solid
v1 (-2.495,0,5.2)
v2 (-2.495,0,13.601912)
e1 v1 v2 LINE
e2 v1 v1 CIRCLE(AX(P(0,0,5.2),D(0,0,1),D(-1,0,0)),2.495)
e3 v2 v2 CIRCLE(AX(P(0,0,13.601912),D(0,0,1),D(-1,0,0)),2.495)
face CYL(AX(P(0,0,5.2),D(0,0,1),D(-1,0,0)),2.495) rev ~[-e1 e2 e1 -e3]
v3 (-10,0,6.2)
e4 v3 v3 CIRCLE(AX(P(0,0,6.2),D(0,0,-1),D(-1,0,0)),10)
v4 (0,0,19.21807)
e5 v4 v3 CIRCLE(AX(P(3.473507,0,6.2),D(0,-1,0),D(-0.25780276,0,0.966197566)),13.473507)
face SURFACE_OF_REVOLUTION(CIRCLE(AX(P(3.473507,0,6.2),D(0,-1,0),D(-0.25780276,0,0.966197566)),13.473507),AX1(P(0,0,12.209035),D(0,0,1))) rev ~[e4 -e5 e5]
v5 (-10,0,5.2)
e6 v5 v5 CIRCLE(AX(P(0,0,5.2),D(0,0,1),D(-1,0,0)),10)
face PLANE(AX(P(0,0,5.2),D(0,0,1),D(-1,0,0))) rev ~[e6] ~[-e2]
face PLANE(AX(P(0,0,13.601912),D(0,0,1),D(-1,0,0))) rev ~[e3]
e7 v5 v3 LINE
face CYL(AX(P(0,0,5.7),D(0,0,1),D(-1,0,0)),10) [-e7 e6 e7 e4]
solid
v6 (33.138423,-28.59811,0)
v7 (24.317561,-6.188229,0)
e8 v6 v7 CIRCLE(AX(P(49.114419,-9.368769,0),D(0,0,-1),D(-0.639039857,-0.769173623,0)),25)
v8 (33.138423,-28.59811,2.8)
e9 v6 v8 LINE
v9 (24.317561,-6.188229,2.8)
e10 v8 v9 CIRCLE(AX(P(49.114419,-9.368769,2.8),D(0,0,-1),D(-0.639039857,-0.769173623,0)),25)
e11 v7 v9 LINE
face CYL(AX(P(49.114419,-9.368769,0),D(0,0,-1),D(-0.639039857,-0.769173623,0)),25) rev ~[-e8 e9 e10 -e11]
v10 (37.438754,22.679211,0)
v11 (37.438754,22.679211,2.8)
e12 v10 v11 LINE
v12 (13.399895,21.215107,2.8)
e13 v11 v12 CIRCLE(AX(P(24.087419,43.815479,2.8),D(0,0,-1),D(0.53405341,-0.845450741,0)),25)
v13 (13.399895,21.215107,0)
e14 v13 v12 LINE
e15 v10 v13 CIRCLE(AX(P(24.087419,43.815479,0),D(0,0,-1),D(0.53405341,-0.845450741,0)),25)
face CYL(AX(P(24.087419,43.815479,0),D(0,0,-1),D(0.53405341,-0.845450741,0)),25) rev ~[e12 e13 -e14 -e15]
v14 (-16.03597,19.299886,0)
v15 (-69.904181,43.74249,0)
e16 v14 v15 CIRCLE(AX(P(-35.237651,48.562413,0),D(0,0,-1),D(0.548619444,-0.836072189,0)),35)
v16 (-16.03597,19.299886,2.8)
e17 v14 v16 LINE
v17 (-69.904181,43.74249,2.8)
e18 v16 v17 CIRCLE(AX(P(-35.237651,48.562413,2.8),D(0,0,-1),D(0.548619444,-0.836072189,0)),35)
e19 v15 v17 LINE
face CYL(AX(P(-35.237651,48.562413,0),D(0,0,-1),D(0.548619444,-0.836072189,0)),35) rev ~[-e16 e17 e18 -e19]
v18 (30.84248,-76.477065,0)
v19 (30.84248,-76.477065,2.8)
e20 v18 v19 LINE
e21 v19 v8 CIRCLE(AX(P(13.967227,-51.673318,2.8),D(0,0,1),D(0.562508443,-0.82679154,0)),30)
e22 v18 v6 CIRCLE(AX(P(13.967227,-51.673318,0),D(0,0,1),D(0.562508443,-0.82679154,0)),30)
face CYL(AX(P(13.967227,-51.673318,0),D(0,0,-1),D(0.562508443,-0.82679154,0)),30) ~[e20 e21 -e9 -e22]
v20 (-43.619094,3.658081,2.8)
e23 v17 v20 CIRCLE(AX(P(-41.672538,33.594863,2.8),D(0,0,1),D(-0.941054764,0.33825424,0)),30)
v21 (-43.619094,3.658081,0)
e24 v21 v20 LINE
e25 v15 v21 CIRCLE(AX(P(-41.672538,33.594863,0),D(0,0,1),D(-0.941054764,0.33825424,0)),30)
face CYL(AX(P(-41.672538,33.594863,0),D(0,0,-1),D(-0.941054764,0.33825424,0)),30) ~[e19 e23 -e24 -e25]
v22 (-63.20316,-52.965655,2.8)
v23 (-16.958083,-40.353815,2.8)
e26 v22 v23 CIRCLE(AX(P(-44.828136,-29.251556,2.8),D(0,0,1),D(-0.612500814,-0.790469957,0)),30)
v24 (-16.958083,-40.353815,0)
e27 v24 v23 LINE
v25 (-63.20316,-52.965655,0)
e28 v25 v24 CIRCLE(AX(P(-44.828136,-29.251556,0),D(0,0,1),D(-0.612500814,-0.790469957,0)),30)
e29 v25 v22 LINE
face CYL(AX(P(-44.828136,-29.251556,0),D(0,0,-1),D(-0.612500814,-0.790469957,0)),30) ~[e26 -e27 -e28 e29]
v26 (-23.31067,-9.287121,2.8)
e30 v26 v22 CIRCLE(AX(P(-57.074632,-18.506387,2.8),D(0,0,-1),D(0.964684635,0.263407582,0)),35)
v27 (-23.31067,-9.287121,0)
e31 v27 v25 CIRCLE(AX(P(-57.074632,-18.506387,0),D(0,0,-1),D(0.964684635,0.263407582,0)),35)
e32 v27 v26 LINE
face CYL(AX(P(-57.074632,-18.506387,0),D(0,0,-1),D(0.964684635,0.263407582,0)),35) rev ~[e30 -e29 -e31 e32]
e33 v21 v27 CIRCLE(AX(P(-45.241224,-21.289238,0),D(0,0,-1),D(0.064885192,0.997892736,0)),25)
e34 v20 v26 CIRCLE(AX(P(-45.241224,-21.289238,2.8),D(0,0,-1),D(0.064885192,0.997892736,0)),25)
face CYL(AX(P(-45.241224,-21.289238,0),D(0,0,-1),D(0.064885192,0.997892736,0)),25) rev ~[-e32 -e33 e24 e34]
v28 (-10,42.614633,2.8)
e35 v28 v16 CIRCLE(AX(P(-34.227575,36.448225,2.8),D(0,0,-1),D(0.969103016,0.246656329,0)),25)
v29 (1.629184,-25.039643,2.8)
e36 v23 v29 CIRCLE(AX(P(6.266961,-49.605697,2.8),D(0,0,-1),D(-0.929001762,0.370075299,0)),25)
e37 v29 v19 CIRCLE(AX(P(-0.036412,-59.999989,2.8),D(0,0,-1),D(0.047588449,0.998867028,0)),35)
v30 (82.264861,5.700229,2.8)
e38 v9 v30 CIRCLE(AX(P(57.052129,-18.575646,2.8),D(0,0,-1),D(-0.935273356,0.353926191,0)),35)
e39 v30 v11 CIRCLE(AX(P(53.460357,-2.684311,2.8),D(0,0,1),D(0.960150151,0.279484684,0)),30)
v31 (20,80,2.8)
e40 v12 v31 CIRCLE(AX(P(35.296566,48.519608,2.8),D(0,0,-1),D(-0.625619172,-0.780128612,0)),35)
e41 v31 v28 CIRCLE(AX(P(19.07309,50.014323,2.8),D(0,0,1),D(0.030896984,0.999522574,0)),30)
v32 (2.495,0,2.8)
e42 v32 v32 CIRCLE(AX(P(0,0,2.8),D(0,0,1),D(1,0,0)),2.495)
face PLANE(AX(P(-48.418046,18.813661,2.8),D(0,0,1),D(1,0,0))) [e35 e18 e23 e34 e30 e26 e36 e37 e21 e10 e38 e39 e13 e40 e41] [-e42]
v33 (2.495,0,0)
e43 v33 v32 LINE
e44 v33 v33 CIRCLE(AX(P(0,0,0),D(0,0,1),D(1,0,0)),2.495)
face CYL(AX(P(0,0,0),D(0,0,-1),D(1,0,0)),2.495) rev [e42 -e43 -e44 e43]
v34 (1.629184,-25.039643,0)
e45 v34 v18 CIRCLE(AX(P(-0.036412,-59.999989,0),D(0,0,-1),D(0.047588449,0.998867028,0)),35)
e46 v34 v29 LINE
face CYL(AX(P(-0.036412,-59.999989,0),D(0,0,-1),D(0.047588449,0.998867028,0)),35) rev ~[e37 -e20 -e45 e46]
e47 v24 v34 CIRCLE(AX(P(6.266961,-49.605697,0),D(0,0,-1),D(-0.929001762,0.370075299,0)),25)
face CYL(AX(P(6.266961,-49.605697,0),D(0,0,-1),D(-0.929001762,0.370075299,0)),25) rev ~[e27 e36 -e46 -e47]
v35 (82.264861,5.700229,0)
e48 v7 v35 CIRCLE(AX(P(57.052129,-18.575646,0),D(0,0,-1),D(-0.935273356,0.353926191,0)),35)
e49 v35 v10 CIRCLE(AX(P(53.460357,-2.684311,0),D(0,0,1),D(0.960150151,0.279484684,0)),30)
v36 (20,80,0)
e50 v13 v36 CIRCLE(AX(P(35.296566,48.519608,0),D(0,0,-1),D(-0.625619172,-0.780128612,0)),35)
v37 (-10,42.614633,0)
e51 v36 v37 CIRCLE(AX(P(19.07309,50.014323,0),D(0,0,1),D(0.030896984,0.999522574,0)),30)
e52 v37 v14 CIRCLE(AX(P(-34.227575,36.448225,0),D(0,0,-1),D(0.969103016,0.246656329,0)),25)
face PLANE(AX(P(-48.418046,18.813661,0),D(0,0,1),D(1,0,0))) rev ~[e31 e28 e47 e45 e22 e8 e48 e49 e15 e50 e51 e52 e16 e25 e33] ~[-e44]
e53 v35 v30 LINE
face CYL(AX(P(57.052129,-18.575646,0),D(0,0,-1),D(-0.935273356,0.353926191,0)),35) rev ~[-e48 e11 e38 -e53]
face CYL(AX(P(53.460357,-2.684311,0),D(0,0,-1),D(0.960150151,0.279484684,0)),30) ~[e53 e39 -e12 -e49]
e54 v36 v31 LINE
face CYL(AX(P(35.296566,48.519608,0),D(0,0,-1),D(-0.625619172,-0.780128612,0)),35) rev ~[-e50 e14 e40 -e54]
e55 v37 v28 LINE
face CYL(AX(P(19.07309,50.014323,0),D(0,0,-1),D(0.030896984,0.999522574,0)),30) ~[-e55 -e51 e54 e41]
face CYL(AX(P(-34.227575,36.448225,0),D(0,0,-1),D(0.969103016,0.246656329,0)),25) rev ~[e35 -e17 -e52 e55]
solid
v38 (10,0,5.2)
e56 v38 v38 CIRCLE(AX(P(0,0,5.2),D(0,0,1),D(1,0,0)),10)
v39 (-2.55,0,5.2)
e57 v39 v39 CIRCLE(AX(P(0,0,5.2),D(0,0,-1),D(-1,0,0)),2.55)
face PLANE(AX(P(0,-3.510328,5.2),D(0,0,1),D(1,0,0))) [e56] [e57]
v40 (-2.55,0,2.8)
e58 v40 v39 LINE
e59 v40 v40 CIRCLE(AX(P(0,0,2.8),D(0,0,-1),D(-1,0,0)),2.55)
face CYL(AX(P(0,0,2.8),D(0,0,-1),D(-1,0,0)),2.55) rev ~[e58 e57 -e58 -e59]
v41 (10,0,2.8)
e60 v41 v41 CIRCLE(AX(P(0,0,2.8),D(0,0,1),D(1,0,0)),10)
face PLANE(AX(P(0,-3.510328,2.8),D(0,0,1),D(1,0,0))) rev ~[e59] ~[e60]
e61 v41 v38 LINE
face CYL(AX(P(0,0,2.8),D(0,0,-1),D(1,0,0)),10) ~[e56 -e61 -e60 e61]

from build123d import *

# Parameters (mm, degrees)
F0_R     = 2.495
F1_DEPTH = 2.8
F3_DEPTH = 2.4
F5_DEPTH = 1
F6_W     = 7.505
F6_H     = 1


with BuildPart() as f1:
    # F0 (on Top) → F1 (new body)
    with BuildSketch(Plane.XY):
        with BuildLine():
            ThreePointArc((-22.7858082993, 10.2862500528), (-20.3407682899, 14.5345500576), (-17.1137876985, 18.2241123408))
            ThreePointArc((-17.1137876985, 18.2241123408), (-16.5666860585, 18.7537908739), (-16.0359703203, 19.2998864317))
            ThreePointArc((-16.0359703203, 19.2998864317), (-49.6996912533, 16.6900208036), (-69.9041814161, 43.7424898759))
            ThreePointArc((-69.9041814161, 43.7424898759), (-66.7598038962, 17.1440537541), (-43.6190942577, 3.6580806138))
            ThreePointArc((-43.6190942577, 3.6580806138), (-32.5771806136, 5.0068500705), (-22.7858082993, 10.2862500528))
        make_face()
        with BuildLine():
            ThreePointArc((-23.7810968086, -7.7109943963), (-24.9618581995, 1.3804474739), (-22.7858082993, 10.2862500528))
            ThreePointArc((-22.7858082993, 10.2862500528), (-32.5771806136, 5.0068500705), (-43.6190942577, 3.6580806138))
            ThreePointArc((-43.6190942577, 3.6580806138), (-31.8033376807, -0.2078903454), (-23.3106701049, -9.2871211714))
            ThreePointArc((-23.3106701049, -9.2871211714), (-23.5366233714, -8.4962939253), (-23.7810968086, -7.7109943963))
        make_face()
        with BuildLine():
            ThreePointArc((-14.6823545264, 20.2343387725), (-6.4007548293, 24.1667196288), (2.7416031459, 24.8492175368))
            ThreePointArc((2.7416031459, 24.8492175368), (-5.3051050528, 32.5299416652), (-10, 42.6146329052))
            ThreePointArc((-10, 42.6146329052), (-10.0254872889, 30.1825298915), (-16.0359703203, 19.2998864317))
            ThreePointArc((-16.0359703203, 19.2998864317), (-15.353672314, 19.7591598168), (-14.6823545264, 20.2343387725))
        make_face()
        with BuildLine():
            ThreePointArc((-17.1137876985, 18.2241123408), (-15.9298122297, 19.2676174533), (-14.6823545264, 20.2343387725))
            ThreePointArc((-14.6823545264, 20.2343387725), (-15.353672314, 19.7591598168), (-16.0359703203, 19.2998864317))
            ThreePointArc((-16.0359703203, 19.2998864317), (-16.5666860585, 18.7537908739), (-17.1137876985, 18.2241123408))
        make_face()
        with BuildLine():
            ThreePointArc((24.5572095563, -4.684384571), (24.8890562186, -2.3526326842), (25, 0))
            ThreePointArc((25, 0), (24.8697135657, 2.5489894392), (24.4802122271, 5.0714109788))
            ThreePointArc((24.4802122271, 5.0714109788), (21.0059741613, 13.5554066532), (14.7069026764, 20.2165034976))
            ThreePointArc((14.7069026764, 20.2165034976), (13.4020104362, 21.1041729586), (12.0437095584, 21.9077397299))
            ThreePointArc((12.0437095584, 21.9077397299), (7.5375354635, 23.8366432019), (2.7416031459, 24.8492175368))
            ThreePointArc((2.7416031459, 24.8492175368), (-6.4007548293, 24.1667196288), (-14.6823545264, 20.2343387725))
            ThreePointArc((-14.6823545264, 20.2343387725), (-15.9298122297, 19.2676174533), (-17.1137876985, 18.2241123408))
            ThreePointArc((-17.1137876985, 18.2241123408), (-20.3407682899, 14.5345500576), (-22.7858082993, 10.2862500528))
            ThreePointArc((-22.7858082993, 10.2862500528), (-24.9618581995, 1.3804474739), (-23.7810968086, -7.7109943963))
            ThreePointArc((-23.7810968086, -7.7109943963), (-23.2471758286, -9.1961304903), (-22.6206120324, -10.6446188885))
            ThreePointArc((-22.6206120324, -10.6446188885), (-20.1088216239, -14.8537972551), (-16.824007136, -18.4919653874))
            ThreePointArc((-16.824007136, -18.4919653874), (-9.0265219603, -23.3135561702), (-0.015171591, -24.9999953965))
            ThreePointArc((-0.015171591, -24.9999953965), (1.5622674252, -24.9511386612), (3.1334806162, -24.8028486112))
            ThreePointArc((3.1334806162, -24.8028486112), (7.9128330526, -23.7147016233), (12.3880000622, -21.714913181))
            ThreePointArc((12.3880000622, -21.714913181), (19.3831608278, -15.7890175857), (23.7717202497, -7.7398524773))
            ThreePointArc((23.7717202497, -7.7398524773), (24.2127101969, -6.2245212604), (24.5572095563, -4.684384571))
        make_face()
        Circle(F0_R, mode=Mode.SUBTRACT)
        with BuildLine():
            ThreePointArc((2.7416031459, 24.8492175368), (7.5375354635, 23.8366432019), (12.0437095584, 21.9077397299))
            ThreePointArc((12.0437095584, 21.9077397299), (12.7165274833, 21.5510948184), (13.3998954043, 21.2151069652))
            ThreePointArc((13.3998954043, 21.2151069652), (0.5151038299, 52.4247152891), (20, 80))
            ThreePointArc((20, 80), (-4.3249499065, 68.7901504845), (-10, 42.6146329052))
            ThreePointArc((-10, 42.6146329052), (-5.3051050528, 32.5299416652), (2.7416031459, 24.8492175368))
        make_face()
        with BuildLine():
            ThreePointArc((14.7069026764, 20.2165034976), (21.0059741613, 13.5554066532), (24.4802122271, 5.0714109788))
            ThreePointArc((24.4802122271, 5.0714109788), (29.2984453771, 15.0977595306), (37.4387543702, 22.6792109397))
            ThreePointArc((37.4387543702, 22.6792109397), (25.6072457824, 18.8617196848), (13.3998954043, 21.2151069652))
            ThreePointArc((13.3998954043, 21.2151069652), (14.0475320292, 20.7081262812), (14.7069026764, 20.2165034976))
        make_face()
        with BuildLine():
            ThreePointArc((24.4802122271, 5.0714109788), (24.8697135657, 2.5489894392), (25, 0))
            ThreePointArc((25, 0), (24.8890562186, -2.3526326842), (24.5572095563, -4.684384571))
            ThreePointArc((24.5572095563, -4.684384571), (24.4259322621, -5.4344817814), (24.3175611259, -6.1882292523))
            ThreePointArc((24.3175611259, -6.1882292523), (50.0180429279, 15.7102350956), (82.2648611911, 5.7002292241))
            ThreePointArc((82.2648611911, 5.7002292241), (64.0868378543, 25.3705973366), (37.4387543702, 22.6792109397))
            ThreePointArc((37.4387543702, 22.6792109397), (29.2984453771, 15.0977595306), (24.4802122271, 5.0714109788))
        make_face()
        with BuildLine():
            ThreePointArc((24.3175611259, -6.1882292523), (24.0355245661, -6.9608339317), (23.7717202497, -7.7398524773))
            ThreePointArc((23.7717202497, -7.7398524773), (19.3831608278, -15.7890175857), (12.3880000622, -21.714913181))
            ThreePointArc((12.3880000622, -21.714913181), (23.4125401133, -23.1990131213), (33.1384226973, -28.5981097064))
            ThreePointArc((33.1384226973, -28.5981097064), (25.8516355407, -18.52534604), (24.3175611259, -6.1882292523))
        make_face()
        with BuildLine():
            ThreePointArc((33.1384226973, -28.5981097064), (23.4125401133, -23.1990131213), (12.3880000622, -21.714913181))
            ThreePointArc((12.3880000622, -21.714913181), (7.9128330526, -23.7147016233), (3.1334806162, -24.8028486112))
            ThreePointArc((3.1334806162, -24.8028486112), (2.3795288615, -24.9097892705), (1.629183895, -25.0396429732))
            ThreePointArc((1.629183895, -25.0396429732), (30.3977467503, -42.7152560287), (30.8424802959, -76.4770645958))
            ThreePointArc((30.8424802959, -76.4770645958), (43.932793932, -53.1102590157), (33.1384226973, -28.5981097064))
        make_face()
        with BuildLine():
            ThreePointArc((1.629183895, -25.0396429732), (0.8072390901, -25.0101582411), (-0.015171591, -24.9999953965))
            ThreePointArc((-0.015171591, -24.9999953965), (-9.0265219603, -23.3135561702), (-16.824007136, -18.4919653874))
            ThreePointArc((-16.824007136, -18.4919653874), (-14.8286998241, -29.435538145), (-16.9580828098, -40.3538147522))
            ThreePointArc((-16.9580828098, -40.3538147522), (-9.6300563535, -30.3110131909), (1.629183895, -25.0396429732))
        make_face()
        with BuildLine():
            ThreePointArc((-16.9580828098, -40.3538147522), (-14.8286998241, -29.435538145), (-16.824007136, -18.4919653874))
            ThreePointArc((-16.824007136, -18.4919653874), (-20.1088216239, -14.8537972551), (-22.6206120324, -10.6446188885))
            ThreePointArc((-22.6206120324, -10.6446188885), (-22.9553025485, -9.9606146404), (-23.3106701049, -9.2871211714))
            ThreePointArc((-23.3106701049, -9.2871211714), (-31.2312022548, -42.1097151595), (-63.2031600709, -52.9656545041))
            ThreePointArc((-63.2031600709, -52.9656545041), (-36.9348779836, -58.1945425595), (-16.9580828098, -40.3538147522))
        make_face()
        with BuildLine():
            ThreePointArc((-23.3106701049, -9.2871211714), (-22.9553025485, -9.9606146404), (-22.6206120324, -10.6446188885))
            ThreePointArc((-22.6206120324, -10.6446188885), (-23.2471758286, -9.1961304903), (-23.7810968086, -7.7109943963))
            ThreePointArc((-23.7810968086, -7.7109943963), (-23.5366233714, -8.4962939253), (-23.3106701049, -9.2871211714))
        make_face()
        with BuildLine():
            ThreePointArc((1.629183895, -25.0396429732), (2.3795288615, -24.9097892705), (3.1334806162, -24.8028486112))
            ThreePointArc((3.1334806162, -24.8028486112), (1.5622674252, -24.9511386612), (-0.015171591, -24.9999953965))
            ThreePointArc((-0.015171591, -24.9999953965), (0.8072390901, -25.0101582411), (1.629183895, -25.0396429732))
        make_face()
        with BuildLine():
            ThreePointArc((24.3175611259, -6.1882292523), (24.4259322621, -5.4344817814), (24.5572095563, -4.684384571))
            ThreePointArc((24.5572095563, -4.684384571), (24.2127101969, -6.2245212604), (23.7717202497, -7.7398524773))
            ThreePointArc((23.7717202497, -7.7398524773), (24.0355245661, -6.9608339317), (24.3175611259, -6.1882292523))
        make_face()
        with BuildLine():
            ThreePointArc((12.0437095584, 21.9077397299), (13.4020104362, 21.1041729586), (14.7069026764, 20.2165034976))
            ThreePointArc((14.7069026764, 20.2165034976), (14.0475320292, 20.7081262812), (13.3998954043, 21.2151069652))
            ThreePointArc((13.3998954043, 21.2151069652), (12.7165274833, 21.5510948184), (12.0437095584, 21.9077397299))
        make_face()
    extrude(amount=F1_DEPTH)


with BuildPart() as f3:
    # F2 (on face) → F3 (new body)
    with BuildSketch(Plane.XY.offset(2.8)):
        with BuildLine():
            Line((10, 0), (2.55, 0))
            ThreePointArc((2.55, 0), (0, -2.55), (-2.55, 0))
            Line((-2.55, 0), (-10, 0))
            ThreePointArc((-10, 0), (0, -10), (10, 0))
        make_face()
        with BuildLine():
            ThreePointArc((-2.55, 0), (0, 2.55), (2.55, 0))
            Line((2.55, 0), (10, 0))
            ThreePointArc((10, 0), (0, 10), (-10, 0))
            Line((-10, 0), (-2.55, 0))
        make_face()
    extrude(amount=F3_DEPTH)


with BuildPart() as f5:
    # F4 (on face) → F5 (new body)
    with BuildSketch(Plane.XY.offset(5.2)):
        with BuildLine():
            ThreePointArc((10, 0), (0, 10), (-10, 0))
            Line((-10, 0), (-2.55, 0))
            ThreePointArc((-2.55, 0), (0, 2.55), (2.55, 0))
            Line((2.55, 0), (10, 0))
        make_face()
        with BuildLine():
            ThreePointArc((2.55, 0), (0, 2.55), (-2.55, 0))
            Line((-2.55, 0), (-2.495, 0))
            ThreePointArc((-2.495, 0), (0, 2.495), (2.495, 0))
            Line((2.495, 0), (2.55, 0))
        make_face()
    extrude(amount=F5_DEPTH)

    # F6 (on face) → F7 (revolve)
    with BuildSketch(Plane.XZ):
        with Locations((-6.2475, 5.7)):
            Rectangle(F6_W, F6_H)
        with BuildLine():
            ThreePointArc((0, 19.2180700541), (-7.2114289431, 14.4077729612), (-10, 6.2))
            Line((-10, 6.2), (-2.495, 6.2))
            Line((-2.495, 6.2), (-2.495, 13.6019121855))
            Line((-2.495, 13.6019121855), (0, 13.6019121855))
            Line((0, 13.6019121855), (0, 19.2180700541))
        make_face()
    revolve(axis=Axis((0, 0, 12.209035027), (0, 0, 1)))


solid = Compound([f1.part, f3.part, f5.part])
